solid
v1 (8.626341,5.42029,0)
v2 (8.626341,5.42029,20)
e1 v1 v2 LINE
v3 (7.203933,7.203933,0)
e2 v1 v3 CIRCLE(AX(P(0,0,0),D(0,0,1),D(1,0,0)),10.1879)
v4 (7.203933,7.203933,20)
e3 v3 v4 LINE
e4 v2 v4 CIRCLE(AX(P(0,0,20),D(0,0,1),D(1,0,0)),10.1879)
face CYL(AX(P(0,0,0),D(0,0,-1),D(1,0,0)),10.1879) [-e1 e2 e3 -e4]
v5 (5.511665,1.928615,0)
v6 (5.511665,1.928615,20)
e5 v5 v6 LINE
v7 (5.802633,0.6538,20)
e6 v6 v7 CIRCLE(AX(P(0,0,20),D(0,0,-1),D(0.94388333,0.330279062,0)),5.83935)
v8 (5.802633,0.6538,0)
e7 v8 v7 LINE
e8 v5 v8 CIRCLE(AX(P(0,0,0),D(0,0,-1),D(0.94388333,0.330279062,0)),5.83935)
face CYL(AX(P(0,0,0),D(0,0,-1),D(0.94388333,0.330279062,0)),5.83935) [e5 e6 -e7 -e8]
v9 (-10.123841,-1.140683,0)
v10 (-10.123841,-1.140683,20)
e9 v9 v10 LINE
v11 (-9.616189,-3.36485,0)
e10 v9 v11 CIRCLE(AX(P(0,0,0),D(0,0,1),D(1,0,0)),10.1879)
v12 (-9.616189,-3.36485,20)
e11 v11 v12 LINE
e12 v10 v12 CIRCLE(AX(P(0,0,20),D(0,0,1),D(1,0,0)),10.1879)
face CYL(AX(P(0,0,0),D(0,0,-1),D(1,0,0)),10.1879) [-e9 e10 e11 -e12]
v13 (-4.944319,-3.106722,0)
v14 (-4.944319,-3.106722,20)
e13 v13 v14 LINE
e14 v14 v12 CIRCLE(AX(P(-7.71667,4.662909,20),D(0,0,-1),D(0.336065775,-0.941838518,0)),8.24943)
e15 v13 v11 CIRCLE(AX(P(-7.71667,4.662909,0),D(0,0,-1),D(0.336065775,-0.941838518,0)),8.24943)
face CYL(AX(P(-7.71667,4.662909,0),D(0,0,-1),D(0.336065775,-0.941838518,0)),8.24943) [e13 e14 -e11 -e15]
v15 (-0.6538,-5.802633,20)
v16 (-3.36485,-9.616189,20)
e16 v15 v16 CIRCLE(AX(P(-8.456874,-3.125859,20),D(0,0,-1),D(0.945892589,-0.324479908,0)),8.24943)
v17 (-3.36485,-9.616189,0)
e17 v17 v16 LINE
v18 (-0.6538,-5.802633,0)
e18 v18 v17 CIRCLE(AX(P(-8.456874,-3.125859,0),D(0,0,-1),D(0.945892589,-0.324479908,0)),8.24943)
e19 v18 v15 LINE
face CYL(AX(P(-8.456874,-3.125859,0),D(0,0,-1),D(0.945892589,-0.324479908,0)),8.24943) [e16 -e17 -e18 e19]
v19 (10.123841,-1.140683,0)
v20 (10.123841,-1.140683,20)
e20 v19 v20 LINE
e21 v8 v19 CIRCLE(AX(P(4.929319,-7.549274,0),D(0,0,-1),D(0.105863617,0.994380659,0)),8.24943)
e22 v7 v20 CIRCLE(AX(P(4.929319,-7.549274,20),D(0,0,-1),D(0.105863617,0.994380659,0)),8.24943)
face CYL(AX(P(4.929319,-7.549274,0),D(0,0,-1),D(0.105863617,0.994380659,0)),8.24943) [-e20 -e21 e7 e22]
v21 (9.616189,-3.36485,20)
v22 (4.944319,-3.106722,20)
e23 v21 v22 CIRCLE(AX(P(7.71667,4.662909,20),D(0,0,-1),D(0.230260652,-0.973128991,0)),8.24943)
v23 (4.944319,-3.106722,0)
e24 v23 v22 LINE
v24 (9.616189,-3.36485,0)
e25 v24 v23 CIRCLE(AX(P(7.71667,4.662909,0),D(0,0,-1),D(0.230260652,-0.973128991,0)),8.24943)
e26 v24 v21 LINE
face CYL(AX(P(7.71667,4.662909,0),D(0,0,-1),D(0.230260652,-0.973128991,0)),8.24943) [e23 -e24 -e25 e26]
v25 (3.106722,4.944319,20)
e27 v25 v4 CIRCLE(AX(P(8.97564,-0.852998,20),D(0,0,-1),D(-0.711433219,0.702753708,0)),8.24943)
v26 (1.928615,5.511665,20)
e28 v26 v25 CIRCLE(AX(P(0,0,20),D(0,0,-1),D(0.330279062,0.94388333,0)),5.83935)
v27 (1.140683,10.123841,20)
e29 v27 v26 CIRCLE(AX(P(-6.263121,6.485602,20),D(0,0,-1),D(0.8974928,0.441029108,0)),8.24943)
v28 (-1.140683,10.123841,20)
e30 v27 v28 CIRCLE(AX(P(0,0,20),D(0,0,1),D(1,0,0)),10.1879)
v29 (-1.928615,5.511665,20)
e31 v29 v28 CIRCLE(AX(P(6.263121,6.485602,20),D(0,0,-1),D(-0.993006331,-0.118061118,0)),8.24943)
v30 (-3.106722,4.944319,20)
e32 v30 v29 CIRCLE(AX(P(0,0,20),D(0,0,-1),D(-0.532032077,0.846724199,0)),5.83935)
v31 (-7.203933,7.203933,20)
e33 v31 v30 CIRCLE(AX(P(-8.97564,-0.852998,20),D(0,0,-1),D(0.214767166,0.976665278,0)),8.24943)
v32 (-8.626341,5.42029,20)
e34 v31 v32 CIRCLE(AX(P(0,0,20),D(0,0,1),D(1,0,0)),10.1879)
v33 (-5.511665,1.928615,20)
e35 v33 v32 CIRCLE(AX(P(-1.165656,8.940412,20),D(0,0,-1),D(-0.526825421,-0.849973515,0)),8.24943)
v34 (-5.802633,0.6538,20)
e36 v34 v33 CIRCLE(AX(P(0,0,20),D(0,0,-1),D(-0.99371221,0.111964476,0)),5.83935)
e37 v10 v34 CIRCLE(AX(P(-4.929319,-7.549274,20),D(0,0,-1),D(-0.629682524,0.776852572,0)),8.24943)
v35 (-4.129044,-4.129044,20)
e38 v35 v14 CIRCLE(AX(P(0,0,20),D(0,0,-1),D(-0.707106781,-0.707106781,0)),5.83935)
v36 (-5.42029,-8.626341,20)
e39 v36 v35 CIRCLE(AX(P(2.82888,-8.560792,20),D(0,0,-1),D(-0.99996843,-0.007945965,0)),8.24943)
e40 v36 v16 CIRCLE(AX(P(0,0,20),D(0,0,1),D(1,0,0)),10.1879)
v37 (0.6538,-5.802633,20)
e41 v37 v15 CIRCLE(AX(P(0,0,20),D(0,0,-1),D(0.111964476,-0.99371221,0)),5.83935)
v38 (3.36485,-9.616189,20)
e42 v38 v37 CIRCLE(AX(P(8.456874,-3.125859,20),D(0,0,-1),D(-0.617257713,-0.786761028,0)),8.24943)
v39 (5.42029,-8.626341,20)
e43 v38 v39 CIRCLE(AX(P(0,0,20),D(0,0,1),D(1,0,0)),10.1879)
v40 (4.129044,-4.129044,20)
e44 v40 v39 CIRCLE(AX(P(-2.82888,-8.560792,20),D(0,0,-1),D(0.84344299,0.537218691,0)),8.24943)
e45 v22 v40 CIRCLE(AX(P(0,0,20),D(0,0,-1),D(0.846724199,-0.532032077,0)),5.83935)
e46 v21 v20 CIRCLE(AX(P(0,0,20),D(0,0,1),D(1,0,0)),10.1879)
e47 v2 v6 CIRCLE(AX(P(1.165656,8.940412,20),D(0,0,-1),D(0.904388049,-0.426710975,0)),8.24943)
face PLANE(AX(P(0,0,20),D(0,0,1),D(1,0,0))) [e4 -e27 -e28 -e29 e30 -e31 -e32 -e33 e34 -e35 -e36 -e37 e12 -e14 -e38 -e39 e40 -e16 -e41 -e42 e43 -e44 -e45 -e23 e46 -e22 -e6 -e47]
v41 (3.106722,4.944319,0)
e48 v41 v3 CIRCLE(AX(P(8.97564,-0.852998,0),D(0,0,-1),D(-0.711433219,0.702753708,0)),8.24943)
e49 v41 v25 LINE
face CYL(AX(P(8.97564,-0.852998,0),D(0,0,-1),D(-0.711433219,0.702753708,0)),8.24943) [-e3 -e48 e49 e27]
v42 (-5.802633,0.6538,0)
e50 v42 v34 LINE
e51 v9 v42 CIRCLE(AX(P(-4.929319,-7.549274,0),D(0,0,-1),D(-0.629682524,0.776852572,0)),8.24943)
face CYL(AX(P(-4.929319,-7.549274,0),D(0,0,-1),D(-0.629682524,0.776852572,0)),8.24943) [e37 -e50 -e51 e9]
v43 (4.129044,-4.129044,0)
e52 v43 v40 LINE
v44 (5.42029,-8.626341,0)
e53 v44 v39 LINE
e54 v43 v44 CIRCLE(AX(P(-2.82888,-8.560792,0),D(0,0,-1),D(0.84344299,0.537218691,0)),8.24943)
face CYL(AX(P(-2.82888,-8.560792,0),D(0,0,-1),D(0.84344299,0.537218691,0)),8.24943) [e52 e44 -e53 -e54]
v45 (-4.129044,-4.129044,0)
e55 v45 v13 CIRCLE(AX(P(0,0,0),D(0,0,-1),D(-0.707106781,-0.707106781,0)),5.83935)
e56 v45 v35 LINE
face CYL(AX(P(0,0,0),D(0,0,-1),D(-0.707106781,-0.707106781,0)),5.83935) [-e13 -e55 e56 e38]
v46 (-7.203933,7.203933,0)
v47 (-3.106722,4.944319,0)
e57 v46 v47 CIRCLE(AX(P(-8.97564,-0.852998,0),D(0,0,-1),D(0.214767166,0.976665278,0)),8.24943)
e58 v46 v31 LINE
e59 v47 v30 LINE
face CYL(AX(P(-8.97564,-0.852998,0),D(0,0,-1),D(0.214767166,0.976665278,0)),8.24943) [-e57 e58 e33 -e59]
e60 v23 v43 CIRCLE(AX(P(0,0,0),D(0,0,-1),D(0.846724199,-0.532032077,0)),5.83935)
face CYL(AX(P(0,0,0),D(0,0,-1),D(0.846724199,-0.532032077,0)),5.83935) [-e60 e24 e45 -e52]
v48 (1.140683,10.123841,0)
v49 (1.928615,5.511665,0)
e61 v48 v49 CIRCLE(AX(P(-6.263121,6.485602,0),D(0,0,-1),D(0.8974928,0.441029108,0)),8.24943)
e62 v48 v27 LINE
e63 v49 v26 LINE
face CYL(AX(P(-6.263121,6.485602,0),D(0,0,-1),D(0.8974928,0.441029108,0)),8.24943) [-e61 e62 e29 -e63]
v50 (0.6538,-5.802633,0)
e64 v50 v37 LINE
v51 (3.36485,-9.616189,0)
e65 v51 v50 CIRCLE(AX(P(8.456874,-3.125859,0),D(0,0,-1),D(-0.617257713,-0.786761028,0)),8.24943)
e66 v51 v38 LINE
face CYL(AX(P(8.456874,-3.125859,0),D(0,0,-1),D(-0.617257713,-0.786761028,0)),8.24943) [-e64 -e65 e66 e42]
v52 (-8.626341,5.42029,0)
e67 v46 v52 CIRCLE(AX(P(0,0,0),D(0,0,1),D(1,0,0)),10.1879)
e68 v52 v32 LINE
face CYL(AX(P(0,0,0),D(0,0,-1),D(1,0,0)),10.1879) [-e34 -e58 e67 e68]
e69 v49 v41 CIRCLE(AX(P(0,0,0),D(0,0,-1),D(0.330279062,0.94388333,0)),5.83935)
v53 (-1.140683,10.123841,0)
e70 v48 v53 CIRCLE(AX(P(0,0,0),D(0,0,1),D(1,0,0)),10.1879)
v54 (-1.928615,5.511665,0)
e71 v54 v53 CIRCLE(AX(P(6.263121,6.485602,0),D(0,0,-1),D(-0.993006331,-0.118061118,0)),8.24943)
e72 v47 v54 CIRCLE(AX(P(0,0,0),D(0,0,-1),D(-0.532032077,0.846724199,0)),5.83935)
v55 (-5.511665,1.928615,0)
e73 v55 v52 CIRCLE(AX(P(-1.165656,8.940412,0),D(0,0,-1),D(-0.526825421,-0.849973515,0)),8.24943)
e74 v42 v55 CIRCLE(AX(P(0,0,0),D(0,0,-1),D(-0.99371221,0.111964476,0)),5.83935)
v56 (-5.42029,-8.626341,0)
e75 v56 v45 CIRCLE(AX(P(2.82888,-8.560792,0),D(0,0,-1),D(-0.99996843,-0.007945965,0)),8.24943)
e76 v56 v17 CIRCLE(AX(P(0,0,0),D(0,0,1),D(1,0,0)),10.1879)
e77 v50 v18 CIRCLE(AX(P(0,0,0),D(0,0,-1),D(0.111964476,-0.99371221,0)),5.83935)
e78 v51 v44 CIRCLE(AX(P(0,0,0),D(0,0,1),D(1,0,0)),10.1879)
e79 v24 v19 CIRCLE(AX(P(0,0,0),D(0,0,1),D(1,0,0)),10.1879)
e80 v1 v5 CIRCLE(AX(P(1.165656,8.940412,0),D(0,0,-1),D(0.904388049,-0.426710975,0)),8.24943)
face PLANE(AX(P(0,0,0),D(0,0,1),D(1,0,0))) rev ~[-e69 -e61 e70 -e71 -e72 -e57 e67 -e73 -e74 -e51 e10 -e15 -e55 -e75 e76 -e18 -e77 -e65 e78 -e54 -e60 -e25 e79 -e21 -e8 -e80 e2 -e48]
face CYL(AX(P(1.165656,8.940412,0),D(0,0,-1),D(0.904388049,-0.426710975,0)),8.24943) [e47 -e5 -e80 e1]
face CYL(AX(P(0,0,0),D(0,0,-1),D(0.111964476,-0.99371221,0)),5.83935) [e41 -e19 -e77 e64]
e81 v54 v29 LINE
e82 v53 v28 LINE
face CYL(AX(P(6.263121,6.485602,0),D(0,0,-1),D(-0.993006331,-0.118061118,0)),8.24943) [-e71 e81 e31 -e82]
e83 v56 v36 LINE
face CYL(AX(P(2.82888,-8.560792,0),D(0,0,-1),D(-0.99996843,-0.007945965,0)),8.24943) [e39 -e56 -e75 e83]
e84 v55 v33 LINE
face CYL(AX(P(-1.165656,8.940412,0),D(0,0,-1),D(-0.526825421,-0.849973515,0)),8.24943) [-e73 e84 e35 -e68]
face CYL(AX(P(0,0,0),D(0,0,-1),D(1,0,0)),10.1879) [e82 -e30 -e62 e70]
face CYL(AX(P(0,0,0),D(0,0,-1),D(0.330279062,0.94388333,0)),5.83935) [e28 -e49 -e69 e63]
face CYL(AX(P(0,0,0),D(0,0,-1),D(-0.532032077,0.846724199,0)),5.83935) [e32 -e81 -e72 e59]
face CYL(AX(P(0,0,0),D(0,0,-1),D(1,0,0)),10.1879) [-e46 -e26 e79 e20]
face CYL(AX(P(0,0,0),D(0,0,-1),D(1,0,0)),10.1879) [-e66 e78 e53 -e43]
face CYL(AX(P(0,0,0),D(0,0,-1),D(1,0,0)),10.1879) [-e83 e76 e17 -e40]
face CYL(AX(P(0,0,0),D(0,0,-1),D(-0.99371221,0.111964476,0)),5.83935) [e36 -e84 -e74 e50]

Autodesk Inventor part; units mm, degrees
sketch "Sketch1" plane through (0, 0, 0) normal (0, 0, 1) x (1, 0, 0)
  circle A0 centre (0, 0) radius 10.1879
  dimension "d0" = 20.3758
extrude "Extrusion1" add sketch "Sketch1" along normal blind 20
ref_plane "Work Plane2" through (0, 0, 10) normal (0, 0, 1) x (1, 0, 0)
sketch "Sketch2" plane through (0, 0, 0) normal (0, 0, -1) x (-1, 0, 0)
  circle A0 centre (0, 0) radius 10.1879 projected
  circle A1 centre (0, 0) radius 7.147
  dimension "d3" = 14.2941
surface extrude "Pitch Diameter" sketch "Sketch2" against normal through all shown no curves A1
ref_plane "Work Plane8" through (0, 0, 0) normal (0.9009689, 0.4338837, 0) x (0, 0, 1)
ref_plane "Work Plane9" through (0, 0, 0) normal (1, 0, 0) x (0, 1, 0)
spur gear teeth "Spur Gear" teeth 7 pitch diameter 14 tip diameter 20.3758 root diameter 11.6787 face width 20 start plane through (0, 0, 0) normal (0, 0, -1) x (-1, 0, 0)
equation "\"d0\" = da_da"
equation "\"d1\" = da_b"
equation "\"d3\" = da_dw"
equation "\"d16\" = da_aw"
equation "\"d43\" = da_aw"
equation "\"d46\" = da_aw"
equation "\"da_da\" = 20.375829"
equation "\"da_b\" = 20"
equation "\"da_dw\" = 14.294055"
equation "\"da_aw\" = 35.735137"
properties part number "Spur Gear1" material "Steel"
